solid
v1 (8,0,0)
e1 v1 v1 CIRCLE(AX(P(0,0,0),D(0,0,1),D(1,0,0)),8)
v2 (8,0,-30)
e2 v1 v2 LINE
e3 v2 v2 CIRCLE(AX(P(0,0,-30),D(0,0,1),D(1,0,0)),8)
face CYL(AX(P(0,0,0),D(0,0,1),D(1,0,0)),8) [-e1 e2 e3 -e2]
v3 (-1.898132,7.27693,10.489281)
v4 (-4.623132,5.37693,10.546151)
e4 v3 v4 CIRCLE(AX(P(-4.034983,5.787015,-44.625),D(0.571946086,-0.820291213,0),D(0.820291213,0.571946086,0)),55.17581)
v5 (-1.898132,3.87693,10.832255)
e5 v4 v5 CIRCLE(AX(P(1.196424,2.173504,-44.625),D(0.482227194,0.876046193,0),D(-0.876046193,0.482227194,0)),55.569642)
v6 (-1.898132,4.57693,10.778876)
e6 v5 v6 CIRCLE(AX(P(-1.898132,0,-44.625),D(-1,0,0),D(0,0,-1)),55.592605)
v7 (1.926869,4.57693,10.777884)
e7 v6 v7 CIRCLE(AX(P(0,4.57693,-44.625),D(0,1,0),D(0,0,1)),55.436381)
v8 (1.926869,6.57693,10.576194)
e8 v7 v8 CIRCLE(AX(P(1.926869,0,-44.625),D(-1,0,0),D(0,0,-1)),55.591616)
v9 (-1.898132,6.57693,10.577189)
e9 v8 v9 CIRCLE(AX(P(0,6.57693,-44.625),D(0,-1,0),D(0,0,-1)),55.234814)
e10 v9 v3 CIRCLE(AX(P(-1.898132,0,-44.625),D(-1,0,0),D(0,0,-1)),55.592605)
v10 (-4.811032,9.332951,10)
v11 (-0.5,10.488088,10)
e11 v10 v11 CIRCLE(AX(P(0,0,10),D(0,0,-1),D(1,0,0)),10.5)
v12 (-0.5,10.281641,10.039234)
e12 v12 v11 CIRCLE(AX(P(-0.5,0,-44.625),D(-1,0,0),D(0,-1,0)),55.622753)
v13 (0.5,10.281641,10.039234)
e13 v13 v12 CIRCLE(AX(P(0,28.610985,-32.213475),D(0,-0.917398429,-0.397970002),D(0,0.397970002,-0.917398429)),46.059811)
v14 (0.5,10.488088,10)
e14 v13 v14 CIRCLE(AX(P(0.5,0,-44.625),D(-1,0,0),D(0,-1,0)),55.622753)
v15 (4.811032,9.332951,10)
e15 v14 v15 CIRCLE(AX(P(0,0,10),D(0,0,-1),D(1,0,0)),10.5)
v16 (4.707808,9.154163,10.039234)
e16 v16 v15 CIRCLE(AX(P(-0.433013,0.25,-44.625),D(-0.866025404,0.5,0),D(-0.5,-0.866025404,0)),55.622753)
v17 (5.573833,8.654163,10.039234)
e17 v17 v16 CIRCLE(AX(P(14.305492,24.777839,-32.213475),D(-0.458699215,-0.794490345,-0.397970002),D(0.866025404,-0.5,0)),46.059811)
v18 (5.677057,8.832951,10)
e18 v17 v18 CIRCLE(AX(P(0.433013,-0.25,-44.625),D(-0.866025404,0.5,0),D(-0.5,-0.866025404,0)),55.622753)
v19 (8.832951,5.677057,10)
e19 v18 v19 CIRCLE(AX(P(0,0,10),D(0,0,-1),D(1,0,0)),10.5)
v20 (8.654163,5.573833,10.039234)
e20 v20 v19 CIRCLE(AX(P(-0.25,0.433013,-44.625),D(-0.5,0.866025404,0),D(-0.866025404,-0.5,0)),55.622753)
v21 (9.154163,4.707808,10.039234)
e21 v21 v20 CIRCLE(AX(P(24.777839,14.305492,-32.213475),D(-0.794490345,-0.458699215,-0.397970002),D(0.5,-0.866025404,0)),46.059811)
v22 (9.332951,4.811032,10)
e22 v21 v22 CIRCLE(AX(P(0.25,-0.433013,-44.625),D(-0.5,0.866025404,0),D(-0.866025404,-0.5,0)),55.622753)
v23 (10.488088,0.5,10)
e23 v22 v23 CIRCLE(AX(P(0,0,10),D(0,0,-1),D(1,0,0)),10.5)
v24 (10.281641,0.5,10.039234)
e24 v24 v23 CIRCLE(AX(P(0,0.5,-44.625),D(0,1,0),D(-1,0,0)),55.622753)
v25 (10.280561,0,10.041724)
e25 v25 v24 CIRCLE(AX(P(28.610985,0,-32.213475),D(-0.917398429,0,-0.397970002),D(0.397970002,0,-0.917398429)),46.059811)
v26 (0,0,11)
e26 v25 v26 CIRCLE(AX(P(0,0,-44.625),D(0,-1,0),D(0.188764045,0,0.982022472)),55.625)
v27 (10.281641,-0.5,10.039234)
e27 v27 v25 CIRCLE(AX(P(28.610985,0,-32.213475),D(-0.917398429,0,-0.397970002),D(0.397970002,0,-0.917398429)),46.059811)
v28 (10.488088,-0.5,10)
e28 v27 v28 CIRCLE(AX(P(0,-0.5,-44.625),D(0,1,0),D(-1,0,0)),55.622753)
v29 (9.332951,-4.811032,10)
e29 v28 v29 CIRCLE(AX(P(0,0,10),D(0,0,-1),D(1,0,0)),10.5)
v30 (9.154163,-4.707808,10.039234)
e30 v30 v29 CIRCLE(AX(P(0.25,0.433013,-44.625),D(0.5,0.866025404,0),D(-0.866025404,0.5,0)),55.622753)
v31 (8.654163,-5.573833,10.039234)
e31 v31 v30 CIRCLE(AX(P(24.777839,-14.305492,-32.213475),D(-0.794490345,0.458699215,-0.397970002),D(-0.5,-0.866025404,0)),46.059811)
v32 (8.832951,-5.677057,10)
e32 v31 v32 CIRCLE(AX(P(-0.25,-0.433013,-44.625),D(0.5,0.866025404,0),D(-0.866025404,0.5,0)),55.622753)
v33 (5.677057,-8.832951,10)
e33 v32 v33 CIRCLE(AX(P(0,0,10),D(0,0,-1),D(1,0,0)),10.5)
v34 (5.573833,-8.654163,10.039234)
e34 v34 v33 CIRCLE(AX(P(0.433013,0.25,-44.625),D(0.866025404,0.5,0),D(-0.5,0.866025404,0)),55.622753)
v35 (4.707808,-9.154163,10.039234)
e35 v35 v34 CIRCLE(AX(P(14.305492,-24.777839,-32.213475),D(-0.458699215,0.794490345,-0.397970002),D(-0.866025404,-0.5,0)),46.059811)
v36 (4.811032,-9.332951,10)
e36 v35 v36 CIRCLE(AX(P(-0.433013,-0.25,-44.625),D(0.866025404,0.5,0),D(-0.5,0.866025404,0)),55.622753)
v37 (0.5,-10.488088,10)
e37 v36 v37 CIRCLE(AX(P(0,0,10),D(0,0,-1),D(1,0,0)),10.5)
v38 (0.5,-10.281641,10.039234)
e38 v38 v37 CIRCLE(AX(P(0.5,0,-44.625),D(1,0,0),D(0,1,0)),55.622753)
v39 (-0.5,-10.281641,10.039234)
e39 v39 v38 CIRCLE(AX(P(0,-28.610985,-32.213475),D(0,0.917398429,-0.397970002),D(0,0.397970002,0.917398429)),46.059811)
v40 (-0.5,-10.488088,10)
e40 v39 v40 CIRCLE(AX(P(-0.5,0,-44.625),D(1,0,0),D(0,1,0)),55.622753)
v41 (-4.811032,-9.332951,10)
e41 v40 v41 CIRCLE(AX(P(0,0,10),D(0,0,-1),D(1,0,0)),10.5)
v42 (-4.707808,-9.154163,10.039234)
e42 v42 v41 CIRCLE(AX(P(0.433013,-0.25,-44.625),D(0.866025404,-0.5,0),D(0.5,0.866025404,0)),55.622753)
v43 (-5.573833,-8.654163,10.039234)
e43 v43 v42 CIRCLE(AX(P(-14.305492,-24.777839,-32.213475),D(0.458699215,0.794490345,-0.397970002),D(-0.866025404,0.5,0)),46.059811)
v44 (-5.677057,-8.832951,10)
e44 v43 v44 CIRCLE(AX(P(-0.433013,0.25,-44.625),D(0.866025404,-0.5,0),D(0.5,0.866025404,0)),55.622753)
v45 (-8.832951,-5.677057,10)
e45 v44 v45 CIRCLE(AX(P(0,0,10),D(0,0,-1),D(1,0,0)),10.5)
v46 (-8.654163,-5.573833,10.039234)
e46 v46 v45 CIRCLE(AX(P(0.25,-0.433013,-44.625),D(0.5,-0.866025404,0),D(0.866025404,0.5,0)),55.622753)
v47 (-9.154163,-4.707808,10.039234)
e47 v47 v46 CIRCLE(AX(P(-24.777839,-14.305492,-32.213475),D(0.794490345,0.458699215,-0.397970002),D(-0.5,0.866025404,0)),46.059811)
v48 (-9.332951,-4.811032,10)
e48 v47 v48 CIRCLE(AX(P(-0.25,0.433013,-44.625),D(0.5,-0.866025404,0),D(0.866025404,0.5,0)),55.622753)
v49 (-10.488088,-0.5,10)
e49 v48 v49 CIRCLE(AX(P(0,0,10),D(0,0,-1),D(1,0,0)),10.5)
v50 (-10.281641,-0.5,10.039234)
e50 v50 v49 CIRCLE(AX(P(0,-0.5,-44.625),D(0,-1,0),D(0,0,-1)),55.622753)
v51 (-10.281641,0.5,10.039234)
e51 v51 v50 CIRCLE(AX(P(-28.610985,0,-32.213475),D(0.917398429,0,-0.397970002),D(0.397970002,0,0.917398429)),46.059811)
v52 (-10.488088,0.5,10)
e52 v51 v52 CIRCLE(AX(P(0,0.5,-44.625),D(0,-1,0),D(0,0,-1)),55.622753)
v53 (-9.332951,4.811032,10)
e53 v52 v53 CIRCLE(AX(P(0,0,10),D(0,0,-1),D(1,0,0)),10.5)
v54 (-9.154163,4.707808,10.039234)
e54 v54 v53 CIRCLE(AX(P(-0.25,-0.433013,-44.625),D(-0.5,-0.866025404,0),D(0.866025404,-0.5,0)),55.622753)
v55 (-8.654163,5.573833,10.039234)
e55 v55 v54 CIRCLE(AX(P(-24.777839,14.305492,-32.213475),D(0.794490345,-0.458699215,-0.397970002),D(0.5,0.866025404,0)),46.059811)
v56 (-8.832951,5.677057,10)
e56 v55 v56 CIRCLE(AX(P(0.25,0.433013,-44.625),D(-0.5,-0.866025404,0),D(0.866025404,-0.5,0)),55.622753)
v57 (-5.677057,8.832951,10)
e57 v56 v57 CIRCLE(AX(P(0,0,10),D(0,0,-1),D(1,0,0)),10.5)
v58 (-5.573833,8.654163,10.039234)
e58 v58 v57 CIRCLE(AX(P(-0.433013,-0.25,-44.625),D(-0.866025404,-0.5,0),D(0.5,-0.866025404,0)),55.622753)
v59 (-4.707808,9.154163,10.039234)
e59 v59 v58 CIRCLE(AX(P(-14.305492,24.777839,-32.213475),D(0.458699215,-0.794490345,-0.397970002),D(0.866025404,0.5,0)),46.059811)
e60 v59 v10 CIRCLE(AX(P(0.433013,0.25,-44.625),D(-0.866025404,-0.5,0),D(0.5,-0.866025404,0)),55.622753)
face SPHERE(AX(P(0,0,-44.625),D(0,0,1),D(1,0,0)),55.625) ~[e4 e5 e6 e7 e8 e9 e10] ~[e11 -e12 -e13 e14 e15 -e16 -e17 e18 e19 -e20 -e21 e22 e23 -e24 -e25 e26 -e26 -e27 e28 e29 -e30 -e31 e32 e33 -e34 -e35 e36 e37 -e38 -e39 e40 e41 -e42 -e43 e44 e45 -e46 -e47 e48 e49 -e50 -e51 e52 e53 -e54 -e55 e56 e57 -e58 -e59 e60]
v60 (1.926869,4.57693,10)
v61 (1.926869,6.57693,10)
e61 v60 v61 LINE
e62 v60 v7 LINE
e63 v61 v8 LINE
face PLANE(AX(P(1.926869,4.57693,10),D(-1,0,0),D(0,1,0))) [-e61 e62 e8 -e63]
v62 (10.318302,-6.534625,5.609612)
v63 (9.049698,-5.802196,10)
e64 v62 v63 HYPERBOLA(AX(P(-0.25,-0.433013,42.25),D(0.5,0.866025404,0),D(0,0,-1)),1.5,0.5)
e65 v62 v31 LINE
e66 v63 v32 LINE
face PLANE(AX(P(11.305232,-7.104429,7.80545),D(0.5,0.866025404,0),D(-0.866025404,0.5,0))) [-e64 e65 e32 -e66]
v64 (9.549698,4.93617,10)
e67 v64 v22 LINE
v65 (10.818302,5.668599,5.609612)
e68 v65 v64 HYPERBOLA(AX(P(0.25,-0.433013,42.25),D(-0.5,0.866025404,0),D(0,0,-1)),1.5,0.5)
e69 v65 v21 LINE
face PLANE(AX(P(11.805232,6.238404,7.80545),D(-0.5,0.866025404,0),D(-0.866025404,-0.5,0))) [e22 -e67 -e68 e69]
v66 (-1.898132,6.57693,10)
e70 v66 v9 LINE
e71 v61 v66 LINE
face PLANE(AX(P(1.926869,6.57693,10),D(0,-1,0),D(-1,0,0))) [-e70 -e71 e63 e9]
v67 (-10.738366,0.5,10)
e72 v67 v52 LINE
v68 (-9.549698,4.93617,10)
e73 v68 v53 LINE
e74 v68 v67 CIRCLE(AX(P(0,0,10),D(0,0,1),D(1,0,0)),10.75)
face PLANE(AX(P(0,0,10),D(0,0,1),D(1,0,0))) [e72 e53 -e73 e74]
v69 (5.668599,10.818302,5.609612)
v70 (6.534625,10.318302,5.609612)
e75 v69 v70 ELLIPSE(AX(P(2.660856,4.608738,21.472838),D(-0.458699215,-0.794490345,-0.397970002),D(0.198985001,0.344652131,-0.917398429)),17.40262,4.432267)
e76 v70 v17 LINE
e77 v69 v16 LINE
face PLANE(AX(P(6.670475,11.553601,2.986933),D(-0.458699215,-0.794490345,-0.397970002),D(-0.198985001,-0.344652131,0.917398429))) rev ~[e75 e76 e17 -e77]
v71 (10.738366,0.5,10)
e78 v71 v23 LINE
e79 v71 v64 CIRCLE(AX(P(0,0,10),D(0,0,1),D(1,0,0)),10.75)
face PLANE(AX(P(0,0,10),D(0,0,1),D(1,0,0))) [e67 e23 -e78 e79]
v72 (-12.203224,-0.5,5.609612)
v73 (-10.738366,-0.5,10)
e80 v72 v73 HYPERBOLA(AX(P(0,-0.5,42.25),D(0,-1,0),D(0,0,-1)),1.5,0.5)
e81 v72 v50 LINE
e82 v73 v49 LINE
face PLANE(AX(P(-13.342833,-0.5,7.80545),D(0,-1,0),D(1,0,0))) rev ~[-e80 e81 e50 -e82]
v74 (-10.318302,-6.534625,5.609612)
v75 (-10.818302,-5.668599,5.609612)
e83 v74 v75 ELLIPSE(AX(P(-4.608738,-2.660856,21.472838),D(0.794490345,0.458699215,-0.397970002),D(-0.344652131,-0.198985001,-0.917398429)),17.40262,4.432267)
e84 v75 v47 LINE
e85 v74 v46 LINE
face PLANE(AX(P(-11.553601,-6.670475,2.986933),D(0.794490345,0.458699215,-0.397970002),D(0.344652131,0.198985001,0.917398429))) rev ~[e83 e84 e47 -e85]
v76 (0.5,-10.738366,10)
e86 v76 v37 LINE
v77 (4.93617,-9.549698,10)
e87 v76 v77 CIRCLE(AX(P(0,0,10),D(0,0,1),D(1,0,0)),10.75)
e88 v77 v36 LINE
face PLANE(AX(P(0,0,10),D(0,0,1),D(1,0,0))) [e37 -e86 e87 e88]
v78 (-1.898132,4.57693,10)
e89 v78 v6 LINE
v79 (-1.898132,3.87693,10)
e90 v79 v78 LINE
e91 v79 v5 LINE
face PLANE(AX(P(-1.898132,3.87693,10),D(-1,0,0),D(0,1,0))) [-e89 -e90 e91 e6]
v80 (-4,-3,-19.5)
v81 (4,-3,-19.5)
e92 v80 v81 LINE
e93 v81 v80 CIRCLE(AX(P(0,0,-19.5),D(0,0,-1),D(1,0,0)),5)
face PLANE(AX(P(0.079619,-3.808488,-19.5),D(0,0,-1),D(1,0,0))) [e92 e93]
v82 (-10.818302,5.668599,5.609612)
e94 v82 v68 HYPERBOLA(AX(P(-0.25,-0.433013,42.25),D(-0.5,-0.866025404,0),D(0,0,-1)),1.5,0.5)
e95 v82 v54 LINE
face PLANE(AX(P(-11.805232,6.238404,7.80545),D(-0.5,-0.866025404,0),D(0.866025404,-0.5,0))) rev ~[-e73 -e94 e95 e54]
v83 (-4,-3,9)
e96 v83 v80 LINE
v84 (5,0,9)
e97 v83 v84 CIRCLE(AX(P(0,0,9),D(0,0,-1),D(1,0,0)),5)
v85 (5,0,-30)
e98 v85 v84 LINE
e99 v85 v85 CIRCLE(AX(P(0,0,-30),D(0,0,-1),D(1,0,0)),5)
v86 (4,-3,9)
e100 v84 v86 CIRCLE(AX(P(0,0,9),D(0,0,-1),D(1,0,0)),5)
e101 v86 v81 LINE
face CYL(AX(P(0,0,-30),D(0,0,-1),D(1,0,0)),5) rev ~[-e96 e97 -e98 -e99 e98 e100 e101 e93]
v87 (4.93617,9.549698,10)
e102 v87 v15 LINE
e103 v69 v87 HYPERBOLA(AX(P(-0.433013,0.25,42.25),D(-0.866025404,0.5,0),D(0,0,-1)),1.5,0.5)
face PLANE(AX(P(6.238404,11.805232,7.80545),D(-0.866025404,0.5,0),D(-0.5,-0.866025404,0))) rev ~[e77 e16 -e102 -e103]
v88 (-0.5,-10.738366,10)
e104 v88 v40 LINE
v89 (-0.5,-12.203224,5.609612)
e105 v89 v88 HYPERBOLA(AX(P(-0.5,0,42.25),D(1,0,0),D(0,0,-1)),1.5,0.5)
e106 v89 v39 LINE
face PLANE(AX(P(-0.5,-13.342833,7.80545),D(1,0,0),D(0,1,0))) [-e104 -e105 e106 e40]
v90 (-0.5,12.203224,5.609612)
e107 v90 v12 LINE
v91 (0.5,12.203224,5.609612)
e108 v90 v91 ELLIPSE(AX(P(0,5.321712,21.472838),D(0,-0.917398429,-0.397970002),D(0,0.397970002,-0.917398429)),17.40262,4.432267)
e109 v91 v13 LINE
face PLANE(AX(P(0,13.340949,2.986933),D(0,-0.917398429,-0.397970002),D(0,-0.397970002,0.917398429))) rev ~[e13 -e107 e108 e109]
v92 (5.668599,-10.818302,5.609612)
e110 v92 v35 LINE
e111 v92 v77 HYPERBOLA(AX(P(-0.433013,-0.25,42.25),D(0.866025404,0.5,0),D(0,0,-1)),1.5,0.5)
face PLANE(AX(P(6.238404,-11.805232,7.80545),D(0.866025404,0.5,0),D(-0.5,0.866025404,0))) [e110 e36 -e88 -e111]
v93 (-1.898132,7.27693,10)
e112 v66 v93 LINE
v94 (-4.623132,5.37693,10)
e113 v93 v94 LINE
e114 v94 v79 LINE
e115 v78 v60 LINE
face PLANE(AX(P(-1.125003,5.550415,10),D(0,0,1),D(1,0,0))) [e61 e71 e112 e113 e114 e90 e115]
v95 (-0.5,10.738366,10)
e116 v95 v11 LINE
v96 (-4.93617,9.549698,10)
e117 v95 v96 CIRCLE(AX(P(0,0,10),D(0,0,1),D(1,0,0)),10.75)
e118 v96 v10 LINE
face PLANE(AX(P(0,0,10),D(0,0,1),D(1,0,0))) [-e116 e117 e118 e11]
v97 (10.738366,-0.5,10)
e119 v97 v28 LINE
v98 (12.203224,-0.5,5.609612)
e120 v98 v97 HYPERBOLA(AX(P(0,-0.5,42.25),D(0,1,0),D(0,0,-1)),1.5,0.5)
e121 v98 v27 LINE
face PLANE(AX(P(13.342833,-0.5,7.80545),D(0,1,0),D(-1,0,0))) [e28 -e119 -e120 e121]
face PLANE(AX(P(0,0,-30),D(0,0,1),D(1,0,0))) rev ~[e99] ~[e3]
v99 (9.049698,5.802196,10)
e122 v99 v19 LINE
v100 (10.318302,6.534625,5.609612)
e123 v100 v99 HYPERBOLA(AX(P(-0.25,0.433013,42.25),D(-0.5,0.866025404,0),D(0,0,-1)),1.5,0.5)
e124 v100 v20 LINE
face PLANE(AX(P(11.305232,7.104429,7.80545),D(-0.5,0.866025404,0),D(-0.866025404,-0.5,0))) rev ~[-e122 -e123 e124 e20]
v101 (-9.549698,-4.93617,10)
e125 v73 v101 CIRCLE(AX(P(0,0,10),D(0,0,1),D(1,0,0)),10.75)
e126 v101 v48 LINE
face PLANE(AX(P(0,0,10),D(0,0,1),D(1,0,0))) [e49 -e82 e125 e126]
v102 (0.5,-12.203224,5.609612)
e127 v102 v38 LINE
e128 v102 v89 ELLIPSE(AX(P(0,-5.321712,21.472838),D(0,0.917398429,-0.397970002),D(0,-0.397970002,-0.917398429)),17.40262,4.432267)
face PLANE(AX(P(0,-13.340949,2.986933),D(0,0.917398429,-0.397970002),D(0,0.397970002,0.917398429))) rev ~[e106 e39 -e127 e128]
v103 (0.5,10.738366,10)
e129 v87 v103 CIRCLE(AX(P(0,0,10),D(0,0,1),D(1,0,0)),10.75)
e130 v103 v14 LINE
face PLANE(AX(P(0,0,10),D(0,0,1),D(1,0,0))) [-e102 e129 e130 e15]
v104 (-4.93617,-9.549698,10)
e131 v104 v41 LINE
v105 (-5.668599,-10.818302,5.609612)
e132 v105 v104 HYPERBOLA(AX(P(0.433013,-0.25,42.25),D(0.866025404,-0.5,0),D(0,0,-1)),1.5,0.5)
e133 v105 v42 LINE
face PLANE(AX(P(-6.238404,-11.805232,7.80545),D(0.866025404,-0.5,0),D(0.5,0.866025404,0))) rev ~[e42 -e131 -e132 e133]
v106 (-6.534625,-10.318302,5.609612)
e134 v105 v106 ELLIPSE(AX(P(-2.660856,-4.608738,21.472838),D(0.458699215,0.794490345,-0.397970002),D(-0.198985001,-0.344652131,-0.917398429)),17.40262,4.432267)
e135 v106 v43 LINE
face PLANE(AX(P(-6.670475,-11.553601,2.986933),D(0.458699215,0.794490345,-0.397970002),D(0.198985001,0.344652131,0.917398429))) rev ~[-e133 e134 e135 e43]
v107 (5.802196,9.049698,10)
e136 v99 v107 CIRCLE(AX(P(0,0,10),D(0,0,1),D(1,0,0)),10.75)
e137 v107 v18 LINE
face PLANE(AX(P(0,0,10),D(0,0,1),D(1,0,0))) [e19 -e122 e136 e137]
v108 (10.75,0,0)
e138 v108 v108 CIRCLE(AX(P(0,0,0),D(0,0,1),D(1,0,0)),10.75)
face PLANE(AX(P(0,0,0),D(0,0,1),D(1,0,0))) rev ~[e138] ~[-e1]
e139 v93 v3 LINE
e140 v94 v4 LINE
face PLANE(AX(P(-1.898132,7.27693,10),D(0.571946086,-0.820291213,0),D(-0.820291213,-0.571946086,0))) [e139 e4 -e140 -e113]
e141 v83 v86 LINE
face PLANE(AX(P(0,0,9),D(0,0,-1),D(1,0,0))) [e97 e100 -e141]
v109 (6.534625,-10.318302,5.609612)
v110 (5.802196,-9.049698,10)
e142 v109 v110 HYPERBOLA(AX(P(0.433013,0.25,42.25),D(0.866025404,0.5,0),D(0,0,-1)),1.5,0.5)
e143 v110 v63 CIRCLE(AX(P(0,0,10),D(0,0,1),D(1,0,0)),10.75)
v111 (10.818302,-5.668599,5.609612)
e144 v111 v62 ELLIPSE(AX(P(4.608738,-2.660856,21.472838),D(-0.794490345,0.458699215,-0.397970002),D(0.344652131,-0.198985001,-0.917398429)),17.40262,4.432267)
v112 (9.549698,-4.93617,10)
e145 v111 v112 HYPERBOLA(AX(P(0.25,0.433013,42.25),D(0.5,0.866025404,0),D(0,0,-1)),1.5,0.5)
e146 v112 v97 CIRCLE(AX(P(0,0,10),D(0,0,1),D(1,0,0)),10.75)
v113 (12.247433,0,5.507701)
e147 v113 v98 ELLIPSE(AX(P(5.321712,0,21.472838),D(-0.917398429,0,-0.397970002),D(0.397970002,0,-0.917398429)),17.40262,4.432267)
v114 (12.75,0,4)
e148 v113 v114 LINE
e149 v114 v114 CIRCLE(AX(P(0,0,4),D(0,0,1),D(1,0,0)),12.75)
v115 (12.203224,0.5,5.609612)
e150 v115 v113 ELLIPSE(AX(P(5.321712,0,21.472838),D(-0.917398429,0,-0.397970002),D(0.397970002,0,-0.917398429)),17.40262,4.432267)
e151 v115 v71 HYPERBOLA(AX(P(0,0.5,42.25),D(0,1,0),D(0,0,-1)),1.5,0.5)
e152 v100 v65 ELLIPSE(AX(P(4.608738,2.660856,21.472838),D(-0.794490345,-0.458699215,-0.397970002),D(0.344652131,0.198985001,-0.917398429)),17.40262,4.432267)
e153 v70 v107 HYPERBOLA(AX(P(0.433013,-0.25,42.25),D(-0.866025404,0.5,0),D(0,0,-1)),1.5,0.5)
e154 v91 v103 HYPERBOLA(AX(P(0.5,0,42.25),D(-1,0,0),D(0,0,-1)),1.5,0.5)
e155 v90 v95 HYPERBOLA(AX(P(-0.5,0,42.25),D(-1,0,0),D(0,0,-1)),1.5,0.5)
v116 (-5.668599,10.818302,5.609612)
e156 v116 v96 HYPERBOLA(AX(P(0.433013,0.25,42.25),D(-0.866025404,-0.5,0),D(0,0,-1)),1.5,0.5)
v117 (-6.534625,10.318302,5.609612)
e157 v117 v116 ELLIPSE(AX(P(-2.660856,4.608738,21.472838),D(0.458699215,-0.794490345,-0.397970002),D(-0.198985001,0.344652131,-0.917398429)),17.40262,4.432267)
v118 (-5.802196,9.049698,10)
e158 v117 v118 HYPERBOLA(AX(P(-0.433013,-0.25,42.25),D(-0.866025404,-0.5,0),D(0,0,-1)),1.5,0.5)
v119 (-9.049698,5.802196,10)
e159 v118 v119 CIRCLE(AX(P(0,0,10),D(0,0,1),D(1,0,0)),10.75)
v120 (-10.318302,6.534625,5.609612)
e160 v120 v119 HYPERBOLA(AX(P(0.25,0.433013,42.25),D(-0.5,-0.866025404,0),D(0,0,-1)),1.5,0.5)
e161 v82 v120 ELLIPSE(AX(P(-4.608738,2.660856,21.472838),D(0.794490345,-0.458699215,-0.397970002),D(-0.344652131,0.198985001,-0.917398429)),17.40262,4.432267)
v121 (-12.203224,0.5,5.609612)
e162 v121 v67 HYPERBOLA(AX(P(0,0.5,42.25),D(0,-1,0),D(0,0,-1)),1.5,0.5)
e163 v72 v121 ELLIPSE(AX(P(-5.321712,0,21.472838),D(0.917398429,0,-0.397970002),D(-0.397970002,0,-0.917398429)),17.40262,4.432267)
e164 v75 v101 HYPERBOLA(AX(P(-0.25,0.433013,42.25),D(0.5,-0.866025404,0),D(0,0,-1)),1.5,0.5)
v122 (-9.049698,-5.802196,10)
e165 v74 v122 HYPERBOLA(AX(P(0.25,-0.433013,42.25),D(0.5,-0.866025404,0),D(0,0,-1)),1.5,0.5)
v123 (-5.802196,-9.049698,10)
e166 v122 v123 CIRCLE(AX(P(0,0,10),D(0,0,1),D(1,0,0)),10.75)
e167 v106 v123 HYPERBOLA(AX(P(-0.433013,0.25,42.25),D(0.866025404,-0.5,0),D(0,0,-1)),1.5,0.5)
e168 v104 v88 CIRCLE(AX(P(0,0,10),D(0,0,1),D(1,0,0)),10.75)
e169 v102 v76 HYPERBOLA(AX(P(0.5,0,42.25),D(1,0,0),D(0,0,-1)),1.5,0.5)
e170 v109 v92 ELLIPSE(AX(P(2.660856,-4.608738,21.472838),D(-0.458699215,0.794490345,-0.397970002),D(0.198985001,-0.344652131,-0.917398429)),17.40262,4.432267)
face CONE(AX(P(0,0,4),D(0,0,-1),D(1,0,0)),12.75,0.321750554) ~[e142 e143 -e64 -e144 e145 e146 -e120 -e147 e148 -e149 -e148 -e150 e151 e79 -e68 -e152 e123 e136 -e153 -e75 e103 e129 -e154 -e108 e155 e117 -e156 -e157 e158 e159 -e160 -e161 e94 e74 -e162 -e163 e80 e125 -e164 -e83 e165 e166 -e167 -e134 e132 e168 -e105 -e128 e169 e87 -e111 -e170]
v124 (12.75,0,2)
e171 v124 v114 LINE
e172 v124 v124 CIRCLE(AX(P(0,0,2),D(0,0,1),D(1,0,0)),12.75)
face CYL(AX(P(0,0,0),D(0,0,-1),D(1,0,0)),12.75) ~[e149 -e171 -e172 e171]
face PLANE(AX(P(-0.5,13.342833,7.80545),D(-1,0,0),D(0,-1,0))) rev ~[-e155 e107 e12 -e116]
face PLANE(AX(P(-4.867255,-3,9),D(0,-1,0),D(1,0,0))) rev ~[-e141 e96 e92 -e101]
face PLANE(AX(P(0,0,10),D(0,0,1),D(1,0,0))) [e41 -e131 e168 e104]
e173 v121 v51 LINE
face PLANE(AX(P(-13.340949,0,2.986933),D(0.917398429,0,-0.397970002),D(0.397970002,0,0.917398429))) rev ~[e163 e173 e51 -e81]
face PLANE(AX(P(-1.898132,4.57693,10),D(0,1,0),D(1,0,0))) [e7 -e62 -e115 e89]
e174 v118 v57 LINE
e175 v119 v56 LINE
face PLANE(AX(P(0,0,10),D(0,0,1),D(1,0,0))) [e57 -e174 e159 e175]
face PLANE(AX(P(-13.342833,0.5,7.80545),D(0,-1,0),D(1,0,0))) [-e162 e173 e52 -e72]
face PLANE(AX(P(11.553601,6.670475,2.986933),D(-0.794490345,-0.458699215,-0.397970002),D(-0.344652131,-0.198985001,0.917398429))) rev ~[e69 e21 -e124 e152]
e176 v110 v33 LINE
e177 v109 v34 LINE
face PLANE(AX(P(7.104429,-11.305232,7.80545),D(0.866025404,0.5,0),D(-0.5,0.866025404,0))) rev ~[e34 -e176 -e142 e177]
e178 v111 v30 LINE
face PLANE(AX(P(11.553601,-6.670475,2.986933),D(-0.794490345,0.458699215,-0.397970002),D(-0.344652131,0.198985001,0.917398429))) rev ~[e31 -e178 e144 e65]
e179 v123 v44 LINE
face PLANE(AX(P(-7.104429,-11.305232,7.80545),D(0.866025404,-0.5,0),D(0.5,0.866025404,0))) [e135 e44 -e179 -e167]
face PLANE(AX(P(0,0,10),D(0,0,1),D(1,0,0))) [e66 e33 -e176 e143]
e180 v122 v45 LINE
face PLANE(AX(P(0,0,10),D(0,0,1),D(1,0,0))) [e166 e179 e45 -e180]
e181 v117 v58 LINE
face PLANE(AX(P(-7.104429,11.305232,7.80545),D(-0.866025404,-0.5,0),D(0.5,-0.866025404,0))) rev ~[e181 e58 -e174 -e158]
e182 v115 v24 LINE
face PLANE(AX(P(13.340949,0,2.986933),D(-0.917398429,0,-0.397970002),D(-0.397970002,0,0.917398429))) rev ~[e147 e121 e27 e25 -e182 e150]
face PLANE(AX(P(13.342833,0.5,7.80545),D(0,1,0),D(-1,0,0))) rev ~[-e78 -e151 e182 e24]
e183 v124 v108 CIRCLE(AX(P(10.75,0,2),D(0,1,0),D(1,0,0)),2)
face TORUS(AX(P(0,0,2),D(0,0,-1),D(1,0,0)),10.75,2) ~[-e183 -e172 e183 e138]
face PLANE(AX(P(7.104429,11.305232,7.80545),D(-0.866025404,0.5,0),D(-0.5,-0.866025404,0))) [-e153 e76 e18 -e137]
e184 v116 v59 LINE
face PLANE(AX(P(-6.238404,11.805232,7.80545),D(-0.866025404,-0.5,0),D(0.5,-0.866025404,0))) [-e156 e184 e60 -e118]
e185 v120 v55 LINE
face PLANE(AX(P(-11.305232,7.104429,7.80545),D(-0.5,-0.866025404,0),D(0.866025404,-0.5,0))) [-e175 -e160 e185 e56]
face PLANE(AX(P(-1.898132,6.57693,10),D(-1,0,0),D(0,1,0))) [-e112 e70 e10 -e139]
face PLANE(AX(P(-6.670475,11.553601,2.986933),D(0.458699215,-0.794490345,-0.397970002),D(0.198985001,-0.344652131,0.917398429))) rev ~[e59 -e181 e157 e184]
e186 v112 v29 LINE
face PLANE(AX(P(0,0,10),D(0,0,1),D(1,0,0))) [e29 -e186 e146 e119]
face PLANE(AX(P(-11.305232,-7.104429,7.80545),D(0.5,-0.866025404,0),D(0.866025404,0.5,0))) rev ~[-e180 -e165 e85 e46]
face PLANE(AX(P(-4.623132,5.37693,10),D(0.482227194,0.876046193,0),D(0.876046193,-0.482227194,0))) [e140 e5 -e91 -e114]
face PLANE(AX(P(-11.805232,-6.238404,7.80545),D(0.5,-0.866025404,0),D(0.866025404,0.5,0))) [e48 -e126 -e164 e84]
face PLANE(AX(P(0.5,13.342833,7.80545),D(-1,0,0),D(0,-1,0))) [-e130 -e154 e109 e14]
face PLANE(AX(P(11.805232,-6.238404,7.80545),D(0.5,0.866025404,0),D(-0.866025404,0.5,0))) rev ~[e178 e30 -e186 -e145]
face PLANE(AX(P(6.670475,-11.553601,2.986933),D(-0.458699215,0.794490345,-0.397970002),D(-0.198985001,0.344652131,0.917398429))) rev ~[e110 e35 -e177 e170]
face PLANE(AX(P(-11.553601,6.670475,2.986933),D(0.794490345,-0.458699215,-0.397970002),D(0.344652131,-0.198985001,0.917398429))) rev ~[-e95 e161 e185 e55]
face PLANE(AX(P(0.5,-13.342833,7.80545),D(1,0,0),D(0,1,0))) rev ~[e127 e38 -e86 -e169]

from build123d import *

# Parameters (mm, degrees)
F0_R             = 8
F1_DEPTH         = 30
F2_R             = 12.75
F3_DEPTH         = 10
F4_SIZE2         = 6
F4_SIZE          = 2
F7_R             = 2
F8_R             = 5
F9_DEPTH         = 39
F11_DEPTH        = 28.5
F13_DEPTH        = 0.5
F13_COPIES_COUNT = 12
F15_DEPTH        = 1


# Not quite as in the source:
# - a pattern or mirror of a feature is missing from the dataset's text; its kind, count and spacing are read off the source's solid


with BuildPart() as f1:
    # F0 (on Top) → F1 (new body)
    with BuildSketch(Plane.XY):
        Circle(F0_R)
    extrude(amount=-F1_DEPTH)

    # F2 (on Top) → F3 (join)
    with BuildSketch(Plane.XY):
        Circle(F2_R)
    extrude(amount=F3_DEPTH)

    # F4
    f4_edges = [f1.edges().sort_by_distance(p)[0] for p in [
        (-12.75, 0, 10),
    ]]
    f4_side = f1.faces().sort_by_distance((0, 0, 10))[0]
    chamfer(f4_edges, length=F4_SIZE, length2=F4_SIZE2, reference=f4_side)

    # F5 (on Front) → F6 (revolve)
    with BuildSketch(Plane.XZ):
        with BuildLine():
            Line((0, 10), (10.5, 10))
            ThreePointArc((10.5, 10), (5.2737557774, 10.749435663), (0, 11))
            Line((0, 11), (0, 10))
        make_face()
    revolve(axis=Axis((0, 0, 11.4106573164), (0, 0, -1)))

    # F7
    f7_edges = [f1.edges().sort_by_distance(p)[0] for p in [
        (-12.75, 0, 0),
    ]]
    fillet(f7_edges, radius=F7_R)

    # F8 (on face) → F9 (cut)
    with BuildSketch(Plane(origin=(0, 0, -30), x_dir=(1, 0, 0), z_dir=(0, 0, -1))):
        Circle(F8_R)
    extrude(amount=-F9_DEPTH, mode=Mode.SUBTRACT)

    # F10 (on face) → F11 (join)
    with BuildSketch(Plane(origin=(0, 0, 9), x_dir=(1, 0, 0), z_dir=(0, 0, -1))):
        Polygon((0, 6), (-4.867254519, 3), (5.0389095293, 3), align=None)
    extrude(amount=F11_DEPTH)

    # F12 (on Front) → F13 (cut, symmetric)
    with BuildSketch(Plane.XZ):
        Polygon((-13.3409490809, 2.9869333375), (-9.9859265611, 10.7209142298), (-13.1098602818, 12.8878117818), (-16.7612417104, 4.4706658365), align=None)
    f13 = extrude(amount=F13_DEPTH, both=True, mode=Mode.SUBTRACT)

    # F13_copies: F13 ×12 about axis
    f13_copies_axis = Axis((0, 0, 0), (0, 0, 1))
    for i in range(1, F13_COPIES_COUNT):
        add(f13.rotate(f13_copies_axis, i * 360 / F13_COPIES_COUNT), mode=Mode.SUBTRACT)

    # F14 (on face) → F15 (cut)
    with BuildSketch(Plane.XY.offset(10)):
        Polygon((1.9268689083, 4.5769295732), (1.9268689083, 6.5769295732), (-1.8981318941, 6.5769295732), (-1.8981318941, 7.2769295732), (-4.6231322793, 5.3769295732), (-1.8981318941, 3.8769295732), (-1.8981318941, 4.5769295732), align=None)
    extrude(amount=F15_DEPTH, mode=Mode.SUBTRACT)


solid = f1.part
